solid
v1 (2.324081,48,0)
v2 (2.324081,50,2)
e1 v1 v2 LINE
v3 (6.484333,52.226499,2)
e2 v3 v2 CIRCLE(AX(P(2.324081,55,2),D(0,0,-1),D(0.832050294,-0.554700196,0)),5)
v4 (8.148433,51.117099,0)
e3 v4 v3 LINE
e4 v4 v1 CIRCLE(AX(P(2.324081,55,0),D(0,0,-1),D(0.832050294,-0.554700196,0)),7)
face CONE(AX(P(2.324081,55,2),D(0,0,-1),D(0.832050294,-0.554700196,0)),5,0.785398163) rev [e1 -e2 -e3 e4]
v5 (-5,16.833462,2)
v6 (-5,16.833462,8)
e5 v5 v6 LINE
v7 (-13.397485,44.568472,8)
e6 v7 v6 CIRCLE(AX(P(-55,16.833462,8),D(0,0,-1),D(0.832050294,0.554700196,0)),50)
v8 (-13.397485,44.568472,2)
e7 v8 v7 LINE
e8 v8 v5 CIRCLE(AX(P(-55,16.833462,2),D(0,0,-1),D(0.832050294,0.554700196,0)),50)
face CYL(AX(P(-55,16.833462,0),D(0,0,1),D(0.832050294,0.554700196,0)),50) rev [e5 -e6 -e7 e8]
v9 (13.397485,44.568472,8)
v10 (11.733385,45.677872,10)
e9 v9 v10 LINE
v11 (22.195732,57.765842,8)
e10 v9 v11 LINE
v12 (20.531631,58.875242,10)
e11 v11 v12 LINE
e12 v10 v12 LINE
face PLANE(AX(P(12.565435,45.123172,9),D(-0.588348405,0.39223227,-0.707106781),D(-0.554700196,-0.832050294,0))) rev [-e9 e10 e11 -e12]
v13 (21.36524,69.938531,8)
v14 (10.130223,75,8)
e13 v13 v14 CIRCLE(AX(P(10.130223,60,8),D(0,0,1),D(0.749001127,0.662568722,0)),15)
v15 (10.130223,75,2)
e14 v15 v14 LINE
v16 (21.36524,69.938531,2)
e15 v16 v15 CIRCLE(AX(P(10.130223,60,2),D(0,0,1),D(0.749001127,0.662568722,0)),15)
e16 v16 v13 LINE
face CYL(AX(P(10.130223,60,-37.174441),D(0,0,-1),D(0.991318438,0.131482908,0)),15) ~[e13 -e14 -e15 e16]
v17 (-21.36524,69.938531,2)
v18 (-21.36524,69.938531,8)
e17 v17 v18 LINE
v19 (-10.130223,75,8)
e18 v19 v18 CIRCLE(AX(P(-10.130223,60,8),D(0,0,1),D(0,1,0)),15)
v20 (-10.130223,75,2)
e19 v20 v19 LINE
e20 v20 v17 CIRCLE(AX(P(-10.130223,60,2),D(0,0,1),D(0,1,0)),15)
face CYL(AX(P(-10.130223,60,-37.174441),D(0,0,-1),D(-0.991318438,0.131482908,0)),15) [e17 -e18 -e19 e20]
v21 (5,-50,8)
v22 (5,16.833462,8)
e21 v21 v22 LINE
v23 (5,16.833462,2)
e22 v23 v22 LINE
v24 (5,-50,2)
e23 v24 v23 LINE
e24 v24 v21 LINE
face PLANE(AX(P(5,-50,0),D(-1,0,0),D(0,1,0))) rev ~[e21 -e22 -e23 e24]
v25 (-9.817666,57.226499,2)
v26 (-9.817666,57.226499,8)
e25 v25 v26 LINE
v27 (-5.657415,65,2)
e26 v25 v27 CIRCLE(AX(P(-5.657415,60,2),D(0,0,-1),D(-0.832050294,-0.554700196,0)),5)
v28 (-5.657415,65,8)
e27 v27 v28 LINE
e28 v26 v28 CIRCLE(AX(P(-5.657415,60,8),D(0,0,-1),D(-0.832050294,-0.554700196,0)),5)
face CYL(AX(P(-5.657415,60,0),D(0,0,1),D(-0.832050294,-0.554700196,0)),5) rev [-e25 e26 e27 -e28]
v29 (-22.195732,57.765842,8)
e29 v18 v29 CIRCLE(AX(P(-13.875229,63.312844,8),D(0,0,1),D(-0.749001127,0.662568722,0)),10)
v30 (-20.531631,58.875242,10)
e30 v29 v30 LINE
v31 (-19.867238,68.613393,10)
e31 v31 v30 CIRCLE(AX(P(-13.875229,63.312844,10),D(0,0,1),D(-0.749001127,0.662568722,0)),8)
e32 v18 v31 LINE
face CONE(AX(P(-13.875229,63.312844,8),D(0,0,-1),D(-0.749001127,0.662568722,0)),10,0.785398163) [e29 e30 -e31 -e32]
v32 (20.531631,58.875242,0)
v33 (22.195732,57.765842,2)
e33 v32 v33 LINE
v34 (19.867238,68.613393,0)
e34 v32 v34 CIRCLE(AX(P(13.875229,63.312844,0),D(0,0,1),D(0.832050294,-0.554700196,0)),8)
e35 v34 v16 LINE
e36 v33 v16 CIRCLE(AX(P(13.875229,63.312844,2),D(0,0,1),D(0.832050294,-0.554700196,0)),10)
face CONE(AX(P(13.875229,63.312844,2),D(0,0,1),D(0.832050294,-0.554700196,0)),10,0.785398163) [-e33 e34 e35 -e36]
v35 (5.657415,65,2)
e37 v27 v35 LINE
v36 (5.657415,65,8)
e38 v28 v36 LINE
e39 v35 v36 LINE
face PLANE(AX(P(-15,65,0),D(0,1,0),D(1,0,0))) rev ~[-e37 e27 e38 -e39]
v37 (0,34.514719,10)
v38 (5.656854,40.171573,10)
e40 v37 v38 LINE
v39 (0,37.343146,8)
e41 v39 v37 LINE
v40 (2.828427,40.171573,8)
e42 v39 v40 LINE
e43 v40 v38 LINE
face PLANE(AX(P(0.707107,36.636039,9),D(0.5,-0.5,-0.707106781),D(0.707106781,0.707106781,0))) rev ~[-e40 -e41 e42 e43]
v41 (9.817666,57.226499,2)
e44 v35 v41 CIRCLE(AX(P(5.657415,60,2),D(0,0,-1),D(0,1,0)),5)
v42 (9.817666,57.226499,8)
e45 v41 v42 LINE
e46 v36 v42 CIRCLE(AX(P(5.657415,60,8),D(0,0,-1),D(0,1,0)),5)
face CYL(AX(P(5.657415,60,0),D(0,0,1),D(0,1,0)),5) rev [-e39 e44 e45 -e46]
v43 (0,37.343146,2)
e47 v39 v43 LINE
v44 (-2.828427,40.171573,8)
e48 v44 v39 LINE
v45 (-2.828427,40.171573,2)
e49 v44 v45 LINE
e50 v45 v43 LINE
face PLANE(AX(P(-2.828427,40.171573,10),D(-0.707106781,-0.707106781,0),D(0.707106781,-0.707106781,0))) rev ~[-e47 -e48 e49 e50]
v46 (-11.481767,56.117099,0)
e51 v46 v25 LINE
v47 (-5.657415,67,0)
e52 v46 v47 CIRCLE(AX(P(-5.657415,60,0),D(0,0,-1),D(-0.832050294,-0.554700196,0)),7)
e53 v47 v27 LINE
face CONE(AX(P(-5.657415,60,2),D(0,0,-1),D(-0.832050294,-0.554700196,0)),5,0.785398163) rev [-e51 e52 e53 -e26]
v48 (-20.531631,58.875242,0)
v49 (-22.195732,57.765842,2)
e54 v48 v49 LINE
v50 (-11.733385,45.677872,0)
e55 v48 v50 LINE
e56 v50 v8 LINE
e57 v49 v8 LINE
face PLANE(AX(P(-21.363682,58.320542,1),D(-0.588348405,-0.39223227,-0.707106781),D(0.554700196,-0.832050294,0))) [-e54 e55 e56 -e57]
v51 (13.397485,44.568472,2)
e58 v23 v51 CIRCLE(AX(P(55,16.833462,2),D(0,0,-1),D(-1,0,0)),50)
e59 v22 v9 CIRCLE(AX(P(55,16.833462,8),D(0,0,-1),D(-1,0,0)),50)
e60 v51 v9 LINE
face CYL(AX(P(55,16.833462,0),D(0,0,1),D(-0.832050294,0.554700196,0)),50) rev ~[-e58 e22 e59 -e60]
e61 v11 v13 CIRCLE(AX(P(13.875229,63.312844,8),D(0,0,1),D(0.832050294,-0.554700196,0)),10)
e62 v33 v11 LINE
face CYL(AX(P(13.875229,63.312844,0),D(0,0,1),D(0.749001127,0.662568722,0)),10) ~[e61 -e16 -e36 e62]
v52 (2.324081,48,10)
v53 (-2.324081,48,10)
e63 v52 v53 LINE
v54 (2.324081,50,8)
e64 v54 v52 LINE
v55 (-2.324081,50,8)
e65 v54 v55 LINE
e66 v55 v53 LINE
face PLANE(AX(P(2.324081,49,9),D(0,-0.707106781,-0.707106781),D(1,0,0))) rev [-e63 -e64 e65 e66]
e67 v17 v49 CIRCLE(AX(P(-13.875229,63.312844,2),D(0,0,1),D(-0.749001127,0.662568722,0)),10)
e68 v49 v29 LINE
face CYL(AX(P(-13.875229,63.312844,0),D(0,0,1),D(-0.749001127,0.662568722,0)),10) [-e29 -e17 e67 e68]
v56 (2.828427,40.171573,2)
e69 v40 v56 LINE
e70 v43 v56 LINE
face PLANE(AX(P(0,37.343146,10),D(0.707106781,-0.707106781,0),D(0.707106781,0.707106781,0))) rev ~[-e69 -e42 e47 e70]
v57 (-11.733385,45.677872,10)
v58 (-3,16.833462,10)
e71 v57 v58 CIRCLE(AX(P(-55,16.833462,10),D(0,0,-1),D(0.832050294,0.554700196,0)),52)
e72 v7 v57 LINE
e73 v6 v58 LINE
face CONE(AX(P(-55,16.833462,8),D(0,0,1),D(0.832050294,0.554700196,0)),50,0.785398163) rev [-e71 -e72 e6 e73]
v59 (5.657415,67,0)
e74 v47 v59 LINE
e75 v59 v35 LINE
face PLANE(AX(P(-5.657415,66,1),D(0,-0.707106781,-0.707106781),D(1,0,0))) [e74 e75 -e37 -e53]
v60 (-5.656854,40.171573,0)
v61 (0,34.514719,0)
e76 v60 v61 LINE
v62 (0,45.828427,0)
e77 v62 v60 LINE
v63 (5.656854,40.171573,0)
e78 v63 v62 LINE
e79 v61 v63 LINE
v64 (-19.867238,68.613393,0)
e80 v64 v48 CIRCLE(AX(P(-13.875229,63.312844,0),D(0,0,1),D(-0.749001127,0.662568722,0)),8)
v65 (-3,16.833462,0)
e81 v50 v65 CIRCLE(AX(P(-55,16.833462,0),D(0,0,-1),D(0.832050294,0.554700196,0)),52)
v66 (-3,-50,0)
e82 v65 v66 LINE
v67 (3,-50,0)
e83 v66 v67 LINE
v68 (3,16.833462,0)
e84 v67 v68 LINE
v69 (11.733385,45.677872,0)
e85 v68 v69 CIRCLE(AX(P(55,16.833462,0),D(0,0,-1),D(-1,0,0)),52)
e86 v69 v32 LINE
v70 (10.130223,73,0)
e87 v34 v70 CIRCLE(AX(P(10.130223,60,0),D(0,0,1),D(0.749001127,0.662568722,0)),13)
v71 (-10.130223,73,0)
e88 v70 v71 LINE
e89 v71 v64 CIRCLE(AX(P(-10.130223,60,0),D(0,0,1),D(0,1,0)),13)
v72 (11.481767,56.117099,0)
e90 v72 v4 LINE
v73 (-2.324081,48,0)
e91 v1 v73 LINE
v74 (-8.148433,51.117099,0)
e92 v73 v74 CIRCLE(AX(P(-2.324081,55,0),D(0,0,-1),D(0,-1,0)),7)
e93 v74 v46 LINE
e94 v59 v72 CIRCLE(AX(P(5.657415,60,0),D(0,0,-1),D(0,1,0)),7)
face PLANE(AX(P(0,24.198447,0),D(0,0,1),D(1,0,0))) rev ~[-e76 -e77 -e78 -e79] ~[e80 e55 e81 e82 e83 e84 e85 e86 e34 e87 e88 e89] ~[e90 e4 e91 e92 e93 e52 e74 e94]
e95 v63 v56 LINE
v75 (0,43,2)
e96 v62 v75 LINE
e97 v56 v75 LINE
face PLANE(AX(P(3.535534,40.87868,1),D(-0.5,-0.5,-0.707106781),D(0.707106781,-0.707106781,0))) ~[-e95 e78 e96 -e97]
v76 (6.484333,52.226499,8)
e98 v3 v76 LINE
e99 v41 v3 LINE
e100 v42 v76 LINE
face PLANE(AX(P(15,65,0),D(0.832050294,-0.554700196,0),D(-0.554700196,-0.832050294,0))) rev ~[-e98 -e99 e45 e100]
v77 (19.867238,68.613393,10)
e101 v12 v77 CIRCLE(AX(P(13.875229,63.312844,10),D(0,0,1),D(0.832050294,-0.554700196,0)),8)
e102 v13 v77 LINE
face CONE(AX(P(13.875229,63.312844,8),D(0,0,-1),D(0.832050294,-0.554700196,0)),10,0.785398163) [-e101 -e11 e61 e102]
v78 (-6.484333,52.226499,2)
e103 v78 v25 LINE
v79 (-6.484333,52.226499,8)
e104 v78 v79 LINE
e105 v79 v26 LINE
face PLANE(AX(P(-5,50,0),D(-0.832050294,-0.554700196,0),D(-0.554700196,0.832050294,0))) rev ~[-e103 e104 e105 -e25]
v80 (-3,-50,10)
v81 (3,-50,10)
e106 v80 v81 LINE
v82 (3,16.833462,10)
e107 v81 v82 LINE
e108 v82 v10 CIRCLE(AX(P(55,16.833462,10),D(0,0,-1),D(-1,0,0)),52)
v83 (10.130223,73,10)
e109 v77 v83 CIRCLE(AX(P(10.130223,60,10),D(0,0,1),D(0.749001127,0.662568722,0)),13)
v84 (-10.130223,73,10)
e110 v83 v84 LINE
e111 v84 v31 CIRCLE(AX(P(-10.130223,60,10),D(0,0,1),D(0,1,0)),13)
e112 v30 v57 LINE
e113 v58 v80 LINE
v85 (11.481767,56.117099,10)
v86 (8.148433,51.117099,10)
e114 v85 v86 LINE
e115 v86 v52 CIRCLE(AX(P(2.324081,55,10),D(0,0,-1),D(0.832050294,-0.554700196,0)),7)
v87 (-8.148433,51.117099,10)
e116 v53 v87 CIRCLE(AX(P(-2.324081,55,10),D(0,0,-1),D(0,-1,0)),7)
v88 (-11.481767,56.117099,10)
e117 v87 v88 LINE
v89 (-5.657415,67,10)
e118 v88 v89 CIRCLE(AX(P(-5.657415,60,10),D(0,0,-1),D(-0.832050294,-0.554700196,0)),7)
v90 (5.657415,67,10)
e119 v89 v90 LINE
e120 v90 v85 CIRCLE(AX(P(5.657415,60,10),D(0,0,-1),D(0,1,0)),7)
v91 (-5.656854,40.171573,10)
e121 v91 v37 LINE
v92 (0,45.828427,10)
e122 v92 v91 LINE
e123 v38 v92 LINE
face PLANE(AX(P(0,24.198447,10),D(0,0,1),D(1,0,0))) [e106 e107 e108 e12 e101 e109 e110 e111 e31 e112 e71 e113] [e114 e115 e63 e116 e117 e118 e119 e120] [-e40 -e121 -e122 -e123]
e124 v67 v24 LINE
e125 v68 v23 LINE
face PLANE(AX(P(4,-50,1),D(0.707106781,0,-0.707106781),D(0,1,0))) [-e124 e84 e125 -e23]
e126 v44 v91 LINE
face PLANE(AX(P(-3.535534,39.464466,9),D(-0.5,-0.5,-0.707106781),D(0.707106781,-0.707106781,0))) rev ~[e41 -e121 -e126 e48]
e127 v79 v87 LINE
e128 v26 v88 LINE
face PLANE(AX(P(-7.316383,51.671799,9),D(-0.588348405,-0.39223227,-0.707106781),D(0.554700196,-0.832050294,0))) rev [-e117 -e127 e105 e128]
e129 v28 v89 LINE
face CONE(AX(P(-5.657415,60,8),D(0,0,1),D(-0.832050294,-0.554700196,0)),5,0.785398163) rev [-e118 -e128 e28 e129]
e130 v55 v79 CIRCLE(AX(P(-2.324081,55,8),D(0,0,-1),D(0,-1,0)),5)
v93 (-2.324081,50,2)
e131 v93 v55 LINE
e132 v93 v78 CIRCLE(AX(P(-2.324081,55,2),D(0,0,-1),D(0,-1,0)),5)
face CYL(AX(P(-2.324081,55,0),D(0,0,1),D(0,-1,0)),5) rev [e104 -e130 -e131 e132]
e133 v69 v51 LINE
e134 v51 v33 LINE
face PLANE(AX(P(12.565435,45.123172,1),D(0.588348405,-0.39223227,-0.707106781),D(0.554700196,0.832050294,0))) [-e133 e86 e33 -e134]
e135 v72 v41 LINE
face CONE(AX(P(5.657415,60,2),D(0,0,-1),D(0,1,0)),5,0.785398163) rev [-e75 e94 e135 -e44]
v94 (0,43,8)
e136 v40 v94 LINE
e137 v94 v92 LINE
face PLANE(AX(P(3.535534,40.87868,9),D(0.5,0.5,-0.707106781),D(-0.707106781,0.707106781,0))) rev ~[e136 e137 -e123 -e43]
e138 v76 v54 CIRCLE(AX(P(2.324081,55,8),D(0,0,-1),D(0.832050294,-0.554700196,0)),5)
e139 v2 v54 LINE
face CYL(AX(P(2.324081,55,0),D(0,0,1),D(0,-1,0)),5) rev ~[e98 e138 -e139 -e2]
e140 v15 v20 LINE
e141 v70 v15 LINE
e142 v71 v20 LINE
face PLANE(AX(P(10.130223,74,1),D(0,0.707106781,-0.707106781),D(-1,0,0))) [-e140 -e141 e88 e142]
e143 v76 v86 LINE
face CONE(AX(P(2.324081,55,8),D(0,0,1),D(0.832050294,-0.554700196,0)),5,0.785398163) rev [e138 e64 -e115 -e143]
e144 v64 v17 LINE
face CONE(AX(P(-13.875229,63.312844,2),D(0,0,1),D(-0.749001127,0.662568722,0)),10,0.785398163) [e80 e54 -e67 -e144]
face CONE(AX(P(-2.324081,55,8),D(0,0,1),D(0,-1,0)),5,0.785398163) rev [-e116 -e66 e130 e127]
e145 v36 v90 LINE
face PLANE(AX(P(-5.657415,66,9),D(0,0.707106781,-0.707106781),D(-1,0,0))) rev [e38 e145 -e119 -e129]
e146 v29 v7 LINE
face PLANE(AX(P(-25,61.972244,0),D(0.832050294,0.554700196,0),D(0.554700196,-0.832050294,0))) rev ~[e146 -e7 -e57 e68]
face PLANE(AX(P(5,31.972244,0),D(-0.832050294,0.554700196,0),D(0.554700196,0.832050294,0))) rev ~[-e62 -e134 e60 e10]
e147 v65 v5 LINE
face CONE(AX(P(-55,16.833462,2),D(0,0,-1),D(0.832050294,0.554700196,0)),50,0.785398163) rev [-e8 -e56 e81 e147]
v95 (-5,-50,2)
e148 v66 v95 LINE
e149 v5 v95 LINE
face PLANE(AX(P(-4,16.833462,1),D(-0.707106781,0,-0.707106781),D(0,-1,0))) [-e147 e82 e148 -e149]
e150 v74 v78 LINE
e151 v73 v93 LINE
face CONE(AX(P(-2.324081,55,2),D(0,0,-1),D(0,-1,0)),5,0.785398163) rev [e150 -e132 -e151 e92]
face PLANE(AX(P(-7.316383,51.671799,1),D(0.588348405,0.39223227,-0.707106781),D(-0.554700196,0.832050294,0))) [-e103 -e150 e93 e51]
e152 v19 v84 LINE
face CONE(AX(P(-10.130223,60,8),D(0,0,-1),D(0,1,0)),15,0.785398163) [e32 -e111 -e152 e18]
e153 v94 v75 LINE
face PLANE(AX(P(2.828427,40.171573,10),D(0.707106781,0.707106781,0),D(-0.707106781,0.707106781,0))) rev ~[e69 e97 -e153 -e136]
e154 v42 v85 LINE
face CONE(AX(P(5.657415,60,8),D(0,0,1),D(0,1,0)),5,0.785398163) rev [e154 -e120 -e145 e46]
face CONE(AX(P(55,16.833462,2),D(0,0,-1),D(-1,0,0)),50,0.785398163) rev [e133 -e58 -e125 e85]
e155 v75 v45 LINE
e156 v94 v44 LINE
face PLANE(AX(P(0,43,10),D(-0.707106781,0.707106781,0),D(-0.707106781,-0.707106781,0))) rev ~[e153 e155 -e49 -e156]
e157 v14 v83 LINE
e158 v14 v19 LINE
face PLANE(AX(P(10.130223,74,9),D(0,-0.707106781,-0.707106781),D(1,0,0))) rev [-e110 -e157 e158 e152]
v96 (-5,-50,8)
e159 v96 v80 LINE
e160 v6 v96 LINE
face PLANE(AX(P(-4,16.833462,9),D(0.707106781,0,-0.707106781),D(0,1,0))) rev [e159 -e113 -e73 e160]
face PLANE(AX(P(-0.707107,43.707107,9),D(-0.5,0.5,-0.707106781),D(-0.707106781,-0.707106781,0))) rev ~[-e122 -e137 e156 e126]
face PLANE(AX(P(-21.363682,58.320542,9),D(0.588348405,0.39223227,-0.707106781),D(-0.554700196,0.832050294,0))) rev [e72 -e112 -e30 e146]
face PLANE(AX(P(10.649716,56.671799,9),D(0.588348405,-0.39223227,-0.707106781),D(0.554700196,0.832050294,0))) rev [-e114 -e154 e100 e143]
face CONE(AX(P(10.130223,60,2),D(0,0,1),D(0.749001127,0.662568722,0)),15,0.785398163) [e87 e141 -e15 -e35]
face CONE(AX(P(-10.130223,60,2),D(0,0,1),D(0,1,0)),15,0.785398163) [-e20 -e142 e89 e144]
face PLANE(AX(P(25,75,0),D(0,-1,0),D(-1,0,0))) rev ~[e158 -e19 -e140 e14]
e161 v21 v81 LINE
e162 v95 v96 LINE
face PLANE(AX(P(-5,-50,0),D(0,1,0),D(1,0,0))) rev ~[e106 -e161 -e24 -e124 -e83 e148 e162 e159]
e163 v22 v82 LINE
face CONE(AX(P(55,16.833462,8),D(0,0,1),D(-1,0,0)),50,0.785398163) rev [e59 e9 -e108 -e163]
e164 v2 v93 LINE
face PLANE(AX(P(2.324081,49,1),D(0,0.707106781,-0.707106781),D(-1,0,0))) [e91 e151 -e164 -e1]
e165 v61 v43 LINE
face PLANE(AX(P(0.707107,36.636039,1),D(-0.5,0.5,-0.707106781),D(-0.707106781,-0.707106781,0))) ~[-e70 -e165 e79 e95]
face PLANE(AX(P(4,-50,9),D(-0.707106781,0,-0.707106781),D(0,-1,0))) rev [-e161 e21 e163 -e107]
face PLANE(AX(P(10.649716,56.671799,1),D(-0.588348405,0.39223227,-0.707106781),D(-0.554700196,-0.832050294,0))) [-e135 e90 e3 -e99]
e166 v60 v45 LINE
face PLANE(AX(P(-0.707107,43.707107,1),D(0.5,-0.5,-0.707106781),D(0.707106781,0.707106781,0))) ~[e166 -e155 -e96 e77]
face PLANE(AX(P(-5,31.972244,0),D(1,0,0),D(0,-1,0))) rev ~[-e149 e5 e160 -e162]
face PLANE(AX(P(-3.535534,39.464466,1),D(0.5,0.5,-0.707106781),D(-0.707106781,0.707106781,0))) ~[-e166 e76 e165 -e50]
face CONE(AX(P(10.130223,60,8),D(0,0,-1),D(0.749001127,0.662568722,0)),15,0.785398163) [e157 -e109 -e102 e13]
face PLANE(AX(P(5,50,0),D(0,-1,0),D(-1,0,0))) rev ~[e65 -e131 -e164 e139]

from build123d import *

# Parameters (mm, degrees)
F0_W        = 30
F0_H        = 10
F1_DEPTH    = 10
F2_R        = 5
F3_T1_DEPTH = 84.348882825
F4_R        = 10
F5_R        = 50
F6_SIZE     = 2
F8_DEPTH    = 10.001
F9_SIZE     = 2


# Not quite as in the source:
# - a fillet or chamfer that OpenCascade refuses, or shapes differently, is made with other operations: its cross-section is extruded or revolved along the edge and cut away or added


with BuildPart() as f1:
    # F0 (on Top) → F1 (new body)
    with BuildSketch(Plane.XY):
        Polygon((5, 50), (-5, 50), (-15, 65), (-15, 75), (-25, 75), (-25, 61.9722436227), (-5, 31.9722436227), (-5, -50), (5, -50), (5, 31.9722436227), (25, 61.9722436227), (25, 75), (15, 75), (15, 65), align=None)
        with Locations((0, 70)):
            Rectangle(F0_W, F0_H)
    extrude(amount=F1_DEPTH)

    # F2
    f2_edges = [f1.edges().sort_by_distance(p)[0] for p in [
        (15, 65, 5),
        (-15, 65, 5),
        (-5, 50, 5),
        (5, 50, 5),
    ]]
    fillet(f2_edges, radius=F2_R)

    # F3: fillet of radius 15 on 2 edges, made by hand

    # F3_s2 → F3_t1 (cut)
    with BuildSketch(Plane.XY.offset(-37.1744414125)):
        with BuildLine():
            ThreePointArc((-25, 61.9722436227), (-20.0149678844, 71.2823679771), (-10.130223435, 75))
            Line((-10.130223435, 75), (-25, 75))
            Line((-25, 75), (-25, 61.9722436227))
        make_face()
        with BuildLine():
            ThreePointArc((25, 61.9722436227), (20.0149678844, 71.2823679771), (10.130223435, 75))
            Line((10.130223435, 75), (25, 75))
            Line((25, 75), (25, 61.9722436227))
        make_face()
    extrude(amount=F3_T1_DEPTH, mode=Mode.SUBTRACT)

    # F4
    f4_edges = [f1.edges().sort_by_distance(p)[0] for p in [
        (-25, 61.972244, 5),
        (25, 61.972244, 5),
    ]]
    fillet(f4_edges, radius=F4_R)

    # F5
    f5_edges = [f1.edges().sort_by_distance(p)[0] for p in [
        (5, 31.972244, 5),
        (-5, 31.972244, 5),
    ]]
    fillet(f5_edges, radius=F5_R)

    # F6
    f6_edges = [f1.edges().sort_by_distance(p)[0] for p in [
        (0, 65, 10),
        (0, 75, 10),
        (0, 50, 0),
        (0, 75, 0),
    ]]
    chamfer(f6_edges, length=F6_SIZE)

    # F7 (on face) → F8 (cut, through all)
    with BuildSketch(Plane.XY.offset(10)):
        Polygon((0, 37.3431457505), (2.8284271247, 40.1715728753), (0, 43), (-2.8284271247, 40.1715728753), align=None)
    extrude(amount=-F8_DEPTH, mode=Mode.SUBTRACT)

    # F9
    f9_edges = [f1.edges().sort_by_distance(p)[0] for p in [
        (1.414214, 41.585786, 10),
        (-1.414214, 41.585786, 10),
        (1.414214, 38.757359, 10),
        (-1.414214, 38.757359, 10),
        (1.414214, 38.757359, 0),
        (1.414214, 41.585786, 0),
        (-1.414214, 41.585786, 0),
        (-1.414214, 38.757359, 0),
    ]]
    chamfer(f9_edges, length=F9_SIZE)


solid = f1.part
